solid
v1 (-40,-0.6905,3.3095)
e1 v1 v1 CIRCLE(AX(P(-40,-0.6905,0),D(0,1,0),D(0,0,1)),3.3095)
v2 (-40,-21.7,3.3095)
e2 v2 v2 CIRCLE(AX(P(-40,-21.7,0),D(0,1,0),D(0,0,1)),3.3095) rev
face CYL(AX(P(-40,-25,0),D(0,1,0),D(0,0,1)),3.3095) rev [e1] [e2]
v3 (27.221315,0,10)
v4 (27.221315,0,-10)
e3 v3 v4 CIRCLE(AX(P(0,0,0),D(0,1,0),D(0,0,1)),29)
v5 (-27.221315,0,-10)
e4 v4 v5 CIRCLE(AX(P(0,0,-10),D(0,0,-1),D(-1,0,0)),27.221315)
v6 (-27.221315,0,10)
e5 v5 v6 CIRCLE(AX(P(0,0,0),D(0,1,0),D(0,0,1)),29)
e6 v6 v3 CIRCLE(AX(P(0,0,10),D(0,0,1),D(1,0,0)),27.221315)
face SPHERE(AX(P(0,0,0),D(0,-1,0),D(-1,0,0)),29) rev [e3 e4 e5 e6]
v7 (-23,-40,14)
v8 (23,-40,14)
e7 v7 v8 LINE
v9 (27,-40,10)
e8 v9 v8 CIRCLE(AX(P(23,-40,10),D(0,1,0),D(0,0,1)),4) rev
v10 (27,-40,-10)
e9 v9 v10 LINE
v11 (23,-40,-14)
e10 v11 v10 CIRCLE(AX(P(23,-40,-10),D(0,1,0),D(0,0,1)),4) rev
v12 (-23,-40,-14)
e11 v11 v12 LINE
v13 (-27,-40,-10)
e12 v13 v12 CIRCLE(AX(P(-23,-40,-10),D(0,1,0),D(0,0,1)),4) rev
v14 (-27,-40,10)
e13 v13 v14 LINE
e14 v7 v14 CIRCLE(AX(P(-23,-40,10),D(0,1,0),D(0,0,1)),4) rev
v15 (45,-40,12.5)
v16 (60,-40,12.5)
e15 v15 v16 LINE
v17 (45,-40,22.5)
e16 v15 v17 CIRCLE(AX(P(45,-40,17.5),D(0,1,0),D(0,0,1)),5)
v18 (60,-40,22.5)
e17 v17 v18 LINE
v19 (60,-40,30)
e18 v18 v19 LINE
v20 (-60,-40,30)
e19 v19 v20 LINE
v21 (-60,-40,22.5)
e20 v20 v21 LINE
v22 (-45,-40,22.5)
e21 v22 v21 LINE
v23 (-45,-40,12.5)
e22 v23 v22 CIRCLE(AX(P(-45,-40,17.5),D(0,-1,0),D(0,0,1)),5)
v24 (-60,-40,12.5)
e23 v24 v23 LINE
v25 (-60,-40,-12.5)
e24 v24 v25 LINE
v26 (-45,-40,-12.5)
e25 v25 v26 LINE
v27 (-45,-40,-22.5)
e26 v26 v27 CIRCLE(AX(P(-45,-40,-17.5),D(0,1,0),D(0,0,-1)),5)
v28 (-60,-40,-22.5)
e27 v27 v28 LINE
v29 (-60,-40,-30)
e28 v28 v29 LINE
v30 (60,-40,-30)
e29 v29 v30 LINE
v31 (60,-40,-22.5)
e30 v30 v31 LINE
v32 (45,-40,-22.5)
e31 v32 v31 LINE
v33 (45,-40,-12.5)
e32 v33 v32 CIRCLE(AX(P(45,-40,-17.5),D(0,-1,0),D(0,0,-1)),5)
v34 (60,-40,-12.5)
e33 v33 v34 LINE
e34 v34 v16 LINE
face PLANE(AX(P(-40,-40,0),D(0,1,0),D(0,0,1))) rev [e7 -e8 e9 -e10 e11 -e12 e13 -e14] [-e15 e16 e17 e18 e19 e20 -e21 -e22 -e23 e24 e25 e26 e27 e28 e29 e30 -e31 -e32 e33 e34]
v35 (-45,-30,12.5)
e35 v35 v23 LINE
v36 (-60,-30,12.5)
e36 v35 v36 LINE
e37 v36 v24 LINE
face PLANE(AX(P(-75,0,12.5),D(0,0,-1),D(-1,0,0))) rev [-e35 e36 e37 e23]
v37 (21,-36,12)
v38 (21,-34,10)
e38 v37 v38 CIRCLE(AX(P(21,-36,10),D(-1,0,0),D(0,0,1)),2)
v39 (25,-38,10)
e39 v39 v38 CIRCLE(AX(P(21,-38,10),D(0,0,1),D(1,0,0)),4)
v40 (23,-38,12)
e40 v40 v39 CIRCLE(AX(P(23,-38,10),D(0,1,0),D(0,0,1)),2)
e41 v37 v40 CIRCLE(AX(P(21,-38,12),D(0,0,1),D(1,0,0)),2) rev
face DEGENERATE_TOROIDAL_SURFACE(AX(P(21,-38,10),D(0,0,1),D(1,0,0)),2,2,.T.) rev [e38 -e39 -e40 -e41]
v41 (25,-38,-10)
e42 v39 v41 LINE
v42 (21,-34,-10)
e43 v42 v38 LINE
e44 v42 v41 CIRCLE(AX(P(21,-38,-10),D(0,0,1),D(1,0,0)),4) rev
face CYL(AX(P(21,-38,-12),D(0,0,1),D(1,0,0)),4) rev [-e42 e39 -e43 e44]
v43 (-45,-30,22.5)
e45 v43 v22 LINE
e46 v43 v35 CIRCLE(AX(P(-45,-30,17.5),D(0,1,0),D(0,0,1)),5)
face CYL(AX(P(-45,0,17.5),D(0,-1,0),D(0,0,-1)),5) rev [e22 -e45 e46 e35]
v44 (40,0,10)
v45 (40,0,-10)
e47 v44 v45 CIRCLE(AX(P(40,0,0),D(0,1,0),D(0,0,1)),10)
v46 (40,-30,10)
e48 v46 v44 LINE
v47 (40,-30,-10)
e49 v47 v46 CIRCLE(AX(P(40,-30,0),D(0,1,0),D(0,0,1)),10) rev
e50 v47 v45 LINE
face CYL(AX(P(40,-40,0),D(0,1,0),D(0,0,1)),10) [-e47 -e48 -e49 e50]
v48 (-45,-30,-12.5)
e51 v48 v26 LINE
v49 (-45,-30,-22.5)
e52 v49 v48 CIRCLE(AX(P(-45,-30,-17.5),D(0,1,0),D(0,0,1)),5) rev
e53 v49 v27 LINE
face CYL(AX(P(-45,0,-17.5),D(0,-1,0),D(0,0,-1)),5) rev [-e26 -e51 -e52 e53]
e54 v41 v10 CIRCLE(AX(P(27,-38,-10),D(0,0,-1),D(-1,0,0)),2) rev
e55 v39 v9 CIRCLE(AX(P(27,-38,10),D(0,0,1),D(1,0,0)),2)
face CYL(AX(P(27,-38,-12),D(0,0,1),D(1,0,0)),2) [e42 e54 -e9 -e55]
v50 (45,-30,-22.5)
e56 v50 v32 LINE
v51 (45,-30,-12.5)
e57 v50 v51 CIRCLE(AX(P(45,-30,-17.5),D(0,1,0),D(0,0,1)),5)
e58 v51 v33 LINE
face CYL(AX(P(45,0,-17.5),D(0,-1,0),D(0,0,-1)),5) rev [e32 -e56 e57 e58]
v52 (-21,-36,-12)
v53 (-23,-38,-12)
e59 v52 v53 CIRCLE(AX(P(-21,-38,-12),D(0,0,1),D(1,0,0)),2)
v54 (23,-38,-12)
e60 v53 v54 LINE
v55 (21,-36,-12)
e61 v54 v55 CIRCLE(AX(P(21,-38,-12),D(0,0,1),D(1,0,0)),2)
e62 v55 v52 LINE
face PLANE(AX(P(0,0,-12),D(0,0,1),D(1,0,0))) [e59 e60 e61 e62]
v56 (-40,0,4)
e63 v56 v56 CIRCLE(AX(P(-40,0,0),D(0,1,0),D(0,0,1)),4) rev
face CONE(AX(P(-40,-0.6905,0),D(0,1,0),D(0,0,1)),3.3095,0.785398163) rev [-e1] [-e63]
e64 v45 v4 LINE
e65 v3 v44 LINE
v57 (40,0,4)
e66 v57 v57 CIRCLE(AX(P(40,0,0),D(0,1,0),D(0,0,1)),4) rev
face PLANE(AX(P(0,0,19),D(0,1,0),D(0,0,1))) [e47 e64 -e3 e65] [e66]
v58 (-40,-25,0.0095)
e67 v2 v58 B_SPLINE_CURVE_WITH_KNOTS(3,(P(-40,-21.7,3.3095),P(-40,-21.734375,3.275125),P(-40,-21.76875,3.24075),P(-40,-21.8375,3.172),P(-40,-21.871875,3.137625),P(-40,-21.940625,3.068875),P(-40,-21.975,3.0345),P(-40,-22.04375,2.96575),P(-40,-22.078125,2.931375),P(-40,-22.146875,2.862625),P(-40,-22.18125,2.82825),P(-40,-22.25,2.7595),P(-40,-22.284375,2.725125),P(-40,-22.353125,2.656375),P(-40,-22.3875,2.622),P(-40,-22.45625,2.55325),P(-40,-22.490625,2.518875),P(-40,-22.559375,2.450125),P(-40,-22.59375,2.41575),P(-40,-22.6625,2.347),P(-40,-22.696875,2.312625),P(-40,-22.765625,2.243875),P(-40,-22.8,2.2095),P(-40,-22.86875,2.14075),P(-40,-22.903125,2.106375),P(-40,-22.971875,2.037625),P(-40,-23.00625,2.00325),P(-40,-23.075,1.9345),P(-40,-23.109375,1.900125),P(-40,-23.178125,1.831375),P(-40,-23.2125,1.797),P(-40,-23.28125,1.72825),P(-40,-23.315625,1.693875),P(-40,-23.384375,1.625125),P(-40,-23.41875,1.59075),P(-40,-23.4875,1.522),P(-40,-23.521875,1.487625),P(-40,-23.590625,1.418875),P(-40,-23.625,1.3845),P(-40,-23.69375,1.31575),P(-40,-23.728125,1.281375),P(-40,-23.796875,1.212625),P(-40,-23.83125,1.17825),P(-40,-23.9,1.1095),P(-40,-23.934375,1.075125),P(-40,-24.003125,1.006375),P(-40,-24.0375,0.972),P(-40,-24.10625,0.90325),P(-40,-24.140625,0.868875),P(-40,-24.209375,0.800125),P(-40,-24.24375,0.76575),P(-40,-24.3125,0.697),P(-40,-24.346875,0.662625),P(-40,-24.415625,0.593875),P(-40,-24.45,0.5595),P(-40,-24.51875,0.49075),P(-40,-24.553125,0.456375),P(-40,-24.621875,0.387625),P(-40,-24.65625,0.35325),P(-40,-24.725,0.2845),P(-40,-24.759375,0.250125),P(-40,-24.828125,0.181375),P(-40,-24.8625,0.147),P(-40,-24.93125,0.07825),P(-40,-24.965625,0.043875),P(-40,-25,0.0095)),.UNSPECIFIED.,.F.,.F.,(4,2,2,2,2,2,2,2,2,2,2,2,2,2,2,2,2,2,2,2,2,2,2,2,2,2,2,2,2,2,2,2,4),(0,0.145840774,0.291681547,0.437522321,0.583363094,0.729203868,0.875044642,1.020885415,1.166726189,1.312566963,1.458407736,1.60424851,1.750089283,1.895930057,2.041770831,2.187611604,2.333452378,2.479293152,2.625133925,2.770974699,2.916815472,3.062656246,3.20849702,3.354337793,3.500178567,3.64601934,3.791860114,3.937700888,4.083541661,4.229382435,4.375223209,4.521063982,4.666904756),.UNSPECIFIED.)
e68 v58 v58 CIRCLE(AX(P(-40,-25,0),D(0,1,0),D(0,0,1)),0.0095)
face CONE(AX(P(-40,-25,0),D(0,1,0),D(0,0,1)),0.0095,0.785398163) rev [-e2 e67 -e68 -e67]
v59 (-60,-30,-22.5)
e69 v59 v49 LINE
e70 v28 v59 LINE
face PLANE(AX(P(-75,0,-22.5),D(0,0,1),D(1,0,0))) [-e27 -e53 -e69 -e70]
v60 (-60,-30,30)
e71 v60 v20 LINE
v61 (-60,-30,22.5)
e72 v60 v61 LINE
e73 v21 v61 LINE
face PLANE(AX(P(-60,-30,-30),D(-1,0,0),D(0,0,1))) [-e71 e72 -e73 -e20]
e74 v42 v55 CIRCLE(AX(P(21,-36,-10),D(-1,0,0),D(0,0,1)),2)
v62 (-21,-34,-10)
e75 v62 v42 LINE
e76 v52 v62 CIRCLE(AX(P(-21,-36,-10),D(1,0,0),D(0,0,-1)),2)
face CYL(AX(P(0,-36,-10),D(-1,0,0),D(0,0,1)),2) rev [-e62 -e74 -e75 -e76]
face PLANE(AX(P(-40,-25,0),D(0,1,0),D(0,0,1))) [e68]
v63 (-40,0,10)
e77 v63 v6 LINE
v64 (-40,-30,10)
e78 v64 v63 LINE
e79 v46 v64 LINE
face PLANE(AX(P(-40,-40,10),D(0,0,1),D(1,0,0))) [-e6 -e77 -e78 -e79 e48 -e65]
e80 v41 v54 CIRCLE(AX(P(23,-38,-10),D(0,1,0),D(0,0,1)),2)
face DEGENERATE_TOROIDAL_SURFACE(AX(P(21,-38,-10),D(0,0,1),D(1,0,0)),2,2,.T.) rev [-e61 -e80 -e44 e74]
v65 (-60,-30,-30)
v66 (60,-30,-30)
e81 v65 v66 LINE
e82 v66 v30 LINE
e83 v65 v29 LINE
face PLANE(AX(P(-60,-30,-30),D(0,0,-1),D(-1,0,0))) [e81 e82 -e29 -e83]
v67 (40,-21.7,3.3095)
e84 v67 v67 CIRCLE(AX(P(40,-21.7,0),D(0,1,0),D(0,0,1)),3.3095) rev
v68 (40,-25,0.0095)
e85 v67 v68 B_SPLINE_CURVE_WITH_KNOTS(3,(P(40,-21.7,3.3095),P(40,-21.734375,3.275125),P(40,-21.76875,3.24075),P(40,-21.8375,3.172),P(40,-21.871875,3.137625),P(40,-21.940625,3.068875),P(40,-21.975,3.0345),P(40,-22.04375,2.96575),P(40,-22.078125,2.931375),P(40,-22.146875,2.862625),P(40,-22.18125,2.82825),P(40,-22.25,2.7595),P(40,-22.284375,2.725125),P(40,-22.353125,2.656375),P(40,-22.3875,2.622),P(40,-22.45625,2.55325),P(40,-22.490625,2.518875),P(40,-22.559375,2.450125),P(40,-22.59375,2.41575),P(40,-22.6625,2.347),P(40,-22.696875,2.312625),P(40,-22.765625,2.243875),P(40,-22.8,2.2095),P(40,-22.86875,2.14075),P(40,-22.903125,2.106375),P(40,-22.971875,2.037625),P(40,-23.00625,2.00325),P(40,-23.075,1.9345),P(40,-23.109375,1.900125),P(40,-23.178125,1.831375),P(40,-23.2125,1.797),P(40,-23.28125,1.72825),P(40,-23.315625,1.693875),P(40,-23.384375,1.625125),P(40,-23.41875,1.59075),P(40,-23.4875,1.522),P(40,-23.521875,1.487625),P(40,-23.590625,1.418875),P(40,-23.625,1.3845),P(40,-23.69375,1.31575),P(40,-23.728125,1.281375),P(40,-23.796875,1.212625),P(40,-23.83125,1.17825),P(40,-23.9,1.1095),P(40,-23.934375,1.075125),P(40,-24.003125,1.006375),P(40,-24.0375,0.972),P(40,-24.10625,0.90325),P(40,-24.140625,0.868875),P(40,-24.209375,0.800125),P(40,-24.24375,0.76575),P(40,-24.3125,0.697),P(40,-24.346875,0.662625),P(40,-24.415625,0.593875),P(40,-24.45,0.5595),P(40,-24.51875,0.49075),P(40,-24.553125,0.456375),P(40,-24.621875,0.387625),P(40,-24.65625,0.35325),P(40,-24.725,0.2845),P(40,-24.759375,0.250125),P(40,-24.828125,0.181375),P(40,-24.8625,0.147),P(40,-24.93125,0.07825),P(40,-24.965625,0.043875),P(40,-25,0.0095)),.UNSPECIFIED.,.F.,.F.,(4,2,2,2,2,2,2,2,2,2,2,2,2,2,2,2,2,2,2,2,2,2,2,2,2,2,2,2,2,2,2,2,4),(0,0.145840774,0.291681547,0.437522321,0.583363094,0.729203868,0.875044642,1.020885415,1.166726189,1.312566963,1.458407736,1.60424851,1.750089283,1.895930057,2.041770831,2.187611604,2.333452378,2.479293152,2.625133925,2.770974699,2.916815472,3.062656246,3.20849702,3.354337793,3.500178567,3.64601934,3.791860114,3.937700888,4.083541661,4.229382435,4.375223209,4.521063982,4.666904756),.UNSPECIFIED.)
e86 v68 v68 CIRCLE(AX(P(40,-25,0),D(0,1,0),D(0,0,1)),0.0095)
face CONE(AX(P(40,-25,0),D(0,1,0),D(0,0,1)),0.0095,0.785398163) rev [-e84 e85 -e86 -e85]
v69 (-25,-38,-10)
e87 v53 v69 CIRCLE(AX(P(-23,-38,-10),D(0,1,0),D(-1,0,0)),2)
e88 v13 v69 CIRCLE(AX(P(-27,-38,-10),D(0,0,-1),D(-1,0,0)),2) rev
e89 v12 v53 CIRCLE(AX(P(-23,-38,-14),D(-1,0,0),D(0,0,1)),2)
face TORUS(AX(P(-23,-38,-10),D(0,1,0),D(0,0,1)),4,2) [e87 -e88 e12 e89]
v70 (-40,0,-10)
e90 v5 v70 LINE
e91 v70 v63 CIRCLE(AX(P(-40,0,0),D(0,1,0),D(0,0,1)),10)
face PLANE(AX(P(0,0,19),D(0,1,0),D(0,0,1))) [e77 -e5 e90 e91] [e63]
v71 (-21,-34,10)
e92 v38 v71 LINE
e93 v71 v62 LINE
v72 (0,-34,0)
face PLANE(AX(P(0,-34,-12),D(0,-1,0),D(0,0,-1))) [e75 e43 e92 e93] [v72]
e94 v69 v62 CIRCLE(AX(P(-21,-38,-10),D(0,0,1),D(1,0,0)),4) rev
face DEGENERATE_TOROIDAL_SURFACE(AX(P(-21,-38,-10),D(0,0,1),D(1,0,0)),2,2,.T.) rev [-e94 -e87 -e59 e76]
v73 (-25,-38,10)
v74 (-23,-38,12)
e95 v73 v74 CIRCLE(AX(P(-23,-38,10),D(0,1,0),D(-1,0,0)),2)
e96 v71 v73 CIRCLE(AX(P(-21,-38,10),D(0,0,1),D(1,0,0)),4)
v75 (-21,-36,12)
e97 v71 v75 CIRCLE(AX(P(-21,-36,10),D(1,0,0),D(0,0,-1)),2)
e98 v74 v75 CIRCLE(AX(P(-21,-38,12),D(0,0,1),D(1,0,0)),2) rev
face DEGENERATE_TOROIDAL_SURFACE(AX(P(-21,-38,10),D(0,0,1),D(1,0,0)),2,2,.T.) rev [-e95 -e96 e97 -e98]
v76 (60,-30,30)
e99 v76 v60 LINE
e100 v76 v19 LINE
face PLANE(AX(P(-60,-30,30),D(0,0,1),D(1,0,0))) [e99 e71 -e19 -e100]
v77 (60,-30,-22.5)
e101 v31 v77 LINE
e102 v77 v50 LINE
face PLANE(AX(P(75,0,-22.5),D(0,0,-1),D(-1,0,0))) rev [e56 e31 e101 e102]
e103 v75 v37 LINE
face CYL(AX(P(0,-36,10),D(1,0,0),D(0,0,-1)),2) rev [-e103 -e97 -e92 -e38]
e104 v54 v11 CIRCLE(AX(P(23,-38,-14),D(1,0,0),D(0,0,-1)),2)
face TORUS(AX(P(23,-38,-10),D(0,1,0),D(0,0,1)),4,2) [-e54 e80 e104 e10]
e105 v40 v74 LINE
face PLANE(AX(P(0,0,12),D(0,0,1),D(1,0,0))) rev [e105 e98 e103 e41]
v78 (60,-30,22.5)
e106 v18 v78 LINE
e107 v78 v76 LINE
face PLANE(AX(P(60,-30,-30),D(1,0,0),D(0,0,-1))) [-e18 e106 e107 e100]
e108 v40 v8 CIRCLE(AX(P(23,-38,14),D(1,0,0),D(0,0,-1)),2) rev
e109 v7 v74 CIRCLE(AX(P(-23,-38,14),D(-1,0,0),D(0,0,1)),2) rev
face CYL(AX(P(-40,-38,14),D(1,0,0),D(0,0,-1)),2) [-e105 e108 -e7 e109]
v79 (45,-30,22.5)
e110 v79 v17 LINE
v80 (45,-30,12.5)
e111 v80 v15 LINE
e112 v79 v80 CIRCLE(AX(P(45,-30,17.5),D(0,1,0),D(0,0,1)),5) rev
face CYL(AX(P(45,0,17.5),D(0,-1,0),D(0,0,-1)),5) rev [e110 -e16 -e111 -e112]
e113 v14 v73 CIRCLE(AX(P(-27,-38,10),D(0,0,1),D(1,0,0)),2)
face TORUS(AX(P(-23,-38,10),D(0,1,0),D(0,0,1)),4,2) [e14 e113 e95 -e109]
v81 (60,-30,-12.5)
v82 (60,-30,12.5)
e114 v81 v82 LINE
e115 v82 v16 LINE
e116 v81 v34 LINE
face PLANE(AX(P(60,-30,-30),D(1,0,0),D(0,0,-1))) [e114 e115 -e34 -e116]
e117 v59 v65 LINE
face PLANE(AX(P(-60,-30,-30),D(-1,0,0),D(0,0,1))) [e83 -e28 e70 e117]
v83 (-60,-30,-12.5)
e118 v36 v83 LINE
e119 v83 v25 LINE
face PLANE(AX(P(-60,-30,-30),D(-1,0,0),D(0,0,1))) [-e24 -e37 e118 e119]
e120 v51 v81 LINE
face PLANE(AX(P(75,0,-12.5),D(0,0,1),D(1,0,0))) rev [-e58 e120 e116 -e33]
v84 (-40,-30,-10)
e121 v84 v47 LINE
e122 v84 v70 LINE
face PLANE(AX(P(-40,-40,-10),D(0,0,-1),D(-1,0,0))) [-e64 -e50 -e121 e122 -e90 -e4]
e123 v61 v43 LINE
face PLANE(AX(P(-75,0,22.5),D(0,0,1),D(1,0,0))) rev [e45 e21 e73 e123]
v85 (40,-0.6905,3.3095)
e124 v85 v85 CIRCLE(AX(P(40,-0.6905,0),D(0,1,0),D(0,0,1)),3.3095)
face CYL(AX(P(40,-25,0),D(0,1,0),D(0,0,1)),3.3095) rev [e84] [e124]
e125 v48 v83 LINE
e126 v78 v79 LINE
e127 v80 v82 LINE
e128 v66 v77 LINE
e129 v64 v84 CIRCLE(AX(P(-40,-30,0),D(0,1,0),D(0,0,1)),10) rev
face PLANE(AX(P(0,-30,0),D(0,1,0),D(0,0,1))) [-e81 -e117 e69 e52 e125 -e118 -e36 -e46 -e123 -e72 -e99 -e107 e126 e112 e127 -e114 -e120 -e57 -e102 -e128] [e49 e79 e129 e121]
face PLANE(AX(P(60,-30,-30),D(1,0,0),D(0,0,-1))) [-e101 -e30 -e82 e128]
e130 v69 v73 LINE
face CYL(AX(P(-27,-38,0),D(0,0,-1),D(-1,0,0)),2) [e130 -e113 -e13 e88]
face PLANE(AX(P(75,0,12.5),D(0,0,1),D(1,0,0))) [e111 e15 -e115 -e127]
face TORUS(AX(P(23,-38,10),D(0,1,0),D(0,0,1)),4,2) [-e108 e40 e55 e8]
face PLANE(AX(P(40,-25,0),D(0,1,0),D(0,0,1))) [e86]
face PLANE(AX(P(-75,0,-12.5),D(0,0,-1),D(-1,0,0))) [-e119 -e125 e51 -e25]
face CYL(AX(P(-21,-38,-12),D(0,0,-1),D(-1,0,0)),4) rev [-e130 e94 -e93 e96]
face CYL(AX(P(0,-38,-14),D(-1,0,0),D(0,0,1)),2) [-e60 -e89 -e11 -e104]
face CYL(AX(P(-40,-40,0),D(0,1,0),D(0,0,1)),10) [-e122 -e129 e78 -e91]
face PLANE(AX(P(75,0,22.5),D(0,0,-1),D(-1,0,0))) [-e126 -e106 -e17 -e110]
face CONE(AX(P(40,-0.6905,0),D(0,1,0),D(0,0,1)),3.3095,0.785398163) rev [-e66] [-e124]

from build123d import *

# Parameters (mm, degrees)
EXTRUDE_2_DEPTH          = 19
EXTRUDE_5_DEPTH          = 40
CUT_EXTRUDE_START        = -10
SKETCH_1_4_R             = 24
CUT_EXTRUDE_1_DEPTH      = 20
SKETCH_4_W               = 120
SKETCH_4_H               = 60
EXTRUDE_6_DEPTH          = 10
FILLET_2_R               = 5
CUT_EXTRUDE_2_DEPTH      = 79.102496759
MIRROR_2_COPY_1_DEPTH    = 79.102496759
CUT_EXTRUDE_3_DEPTH      = 12
SKETCH_6_W               = 25
SKETCH_6_H               = 6
CUT_EXTRUDE_4_DEPTH      = 12
FILLET_3_R               = 4
FILLET_4_R               = 2
SKETCH_7_R               = 3.3095
CUT_EXTRUDE_5_DEPTH      = 25
CHAMFER_1_SIZE           = 3.3
CHAMFER_2_SIZE           = 0.6905
SKETCH_11_W              = 120
SKETCH_11_H              = 68
CUT_EXTRUDE_8_DEPTH      = 80.724525712
CUT_EXTRUDE_9_DEPTH      = 90.493016487
CUT_EXTRUDE_9_DEPTH_BACK = 9
SKETCH_12_W              = 80
SKETCH_12_H              = 30
SKETCH_13_W              = 80
SKETCH_13_H              = 30
CUT_EXTRUDE_10_DEPTH     = 83.462112512


with BuildPart() as part:
    # Эскиз1 → Бобышка-Вытянуть2 (new, symmetric)
    with BuildSketch(Plane.XY):
        with BuildLine():
            Line((35, 0), (26, 0))
            ThreePointArc((26, 0), (0, -26), (-26, 0))
            Line((-26, 0), (-35, 0))
            ThreePointArc((-35, 0), (0, -35), (35, 0))
        make_face()
        with BuildLine():
            Line((26, 0), (24, 0))
            ThreePointArc((24, 0), (0, -24), (-24, 0))
            Line((-24, 0), (-26, 0))
            ThreePointArc((-26, 0), (0, -26), (26, 0))
        make_face()
    extrude(amount=EXTRUDE_2_DEPTH, both=True)

    # Эскиз2 → Бобышка-Вытянуть5 (add)
    with BuildSketch(Plane(origin=(0, 0, 0), x_dir=(1, 0, 0), z_dir=(0, 1, 0))):
        with BuildLine():
            Line((-40, 10), (40, 10))
            ThreePointArc((40, 10), (50, 0), (40, -10))
            Line((40, -10), (-40, -10))
            ThreePointArc((-40, -10), (-50, 0), (-40, 10))
        make_face()
    extrude(amount=-EXTRUDE_5_DEPTH)

    # Эскиз1<4> → Вырез-Вытянуть1 (cut)
    with BuildSketch(Plane.XY.offset(CUT_EXTRUDE_START)):
        Circle(SKETCH_1_4_R)
    extrude(amount=CUT_EXTRUDE_1_DEPTH, mode=Mode.SUBTRACT)

    # Эскиз4 → Бобышка-Вытянуть6 (add)
    with BuildSketch(Plane.XZ.offset(40)):
        Rectangle(SKETCH_4_W, SKETCH_4_H)
    extrude(amount=-EXTRUDE_6_DEPTH)

    # Скругление2
    fillet_2_edges = [part.edges().sort_by_distance(p)[0] for p in [
        (-18.027756377, -30, 14.5),
        (18.027756377, -30, 14.5),
        (18.027756377, -30, -14.5),
        (-18.027756377, -30, -14.5),
    ]]
    fillet(fillet_2_edges, radius=FILLET_2_R)

    # Эскиз5 → Вырез-Вытянуть2 (cut, through all)
    with BuildSketch(Plane.XZ.offset(40)):
        with BuildLine():
            Line((75, -22.5), (45, -22.5))
            ThreePointArc((45, -22.5), (40, -17.5), (45, -12.5))
            Line((45, -12.5), (75, -12.5))
            ThreePointArc((75, -12.5), (80, -17.5), (75, -22.5))
        make_face()
    cut_extrude_2 = extrude(amount=-CUT_EXTRUDE_2_DEPTH, mode=Mode.SUBTRACT)

    # Зеркальное отражение1: Вырез-Вытянуть2 across plane
    add(cut_extrude_2.mirror(Plane.XY), mode=Mode.SUBTRACT)

    # Зеркальное отражение2: Вырез-Вытянуть2 across plane
    add(cut_extrude_2.mirror(Plane(origin=(0, 0, 0), x_dir=(0, 0, 1), z_dir=(1, 0, 0))), mode=Mode.SUBTRACT)

    # Зеркальное отражение2 copy 1 sketch → Зеркальное отражение2 copy 1 (cut, through all)
    with BuildSketch(Plane(origin=(0, -40, 0), x_dir=(-1, 0, 0), z_dir=(0, -1, 0))):
        with BuildLine():
            Line((75, -22.5), (45, -22.5))
            ThreePointArc((45, -22.5), (40, -17.5), (45, -12.5))
            Line((45, -12.5), (75, -12.5))
            ThreePointArc((75, -12.5), (80, -17.5), (75, -22.5))
        make_face()
    extrude(amount=-MIRROR_2_COPY_1_DEPTH, mode=Mode.SUBTRACT)

    # Эскиз1<5> → Вырез-Вытянуть3 (cut, symmetric)
    with BuildSketch(Plane.XY):
        with BuildLine():
            ThreePointArc((-24, 0), (0, 24), (24, 0))
            Line((24, 0), (26, 0))
            ThreePointArc((26, 0), (0, 26), (-26, 0))
            Line((-26, 0), (-24, 0))
        make_face()
        with BuildLine():
            Line((26, 0), (24, 0))
            ThreePointArc((24, 0), (0, -24), (-24, 0))
            Line((-24, 0), (-26, 0))
            ThreePointArc((-26, 0), (0, -26), (26, 0))
        make_face()
    extrude(amount=CUT_EXTRUDE_3_DEPTH, both=True, mode=Mode.SUBTRACT)

    # Эскиз6 → Вырез-Вытянуть4 (cut, symmetric)
    with BuildSketch(Plane.XY):
        with Locations((12.5, -37)):
            Rectangle(SKETCH_6_W, SKETCH_6_H)
    cut_extrude_4 = extrude(amount=CUT_EXTRUDE_4_DEPTH, both=True, mode=Mode.SUBTRACT)

    # Зеркальное отражение3: Вырез-Вытянуть4 across plane
    add(cut_extrude_4.mirror(Plane(origin=(0, -34, -12), x_dir=(0, 0, 1), z_dir=(-1, 0, 0))), mode=Mode.SUBTRACT)

    # Скругление3
    fillet_3_edges = [part.edges().sort_by_distance(p)[0] for p in [
        (25, -34, 0),
        (-25, -34, 0),
    ]]
    fillet(fillet_3_edges, radius=FILLET_3_R)

    # Скругление4
    fillet_4_edges = [part.edges().sort_by_distance(p)[0] for p in [
        (-23.828427125, -35.171572875, 12),
        (23.828427125, -35.171572875, 12),
        (-23.828427125, -35.171572875, -12),
        (23.828427125, -35.171572875, -12),
        (0, -34, 12),
        (0, -34, -12),
        (0, -40, 12),
        (-25, -40, 0),
        (25, -40, 0),
        (0, -40, -12),
    ]]
    fillet(fillet_4_edges, radius=FILLET_4_R - 0.0001)  # a hair under: the kernel refuses the full size

    # Эскиз7 → Вырез-Вытянуть5 (cut)
    with BuildSketch(Plane(origin=(0, 0, 0), x_dir=(1, 0, 0), z_dir=(0, 1, 0))):
        with Locations(Location((-40, 0, 0), (0, 0, 270))):
            Circle(SKETCH_7_R)
        with Locations(Location((40, 0, 0), (0, 0, 270))):
            Circle(SKETCH_7_R)
    extrude(amount=-CUT_EXTRUDE_5_DEPTH, mode=Mode.SUBTRACT)

    # Фаска1
    chamfer_1_edges = [part.edges().sort_by_distance(p)[0] for p in [
        (-40, -25, -3.3095),
        (40, -25, -3.3095),
    ]]
    chamfer(chamfer_1_edges, length=CHAMFER_1_SIZE)

    # Фаска2
    chamfer_2_edges = [part.edges().sort_by_distance(p)[0] for p in [
        (-40, 0, -3.3095),
        (40, 0, -3.3095),
    ]]
    chamfer(chamfer_2_edges, length=CHAMFER_2_SIZE)

    # Эскиз8 → Повернуть1 (revolve)
    with BuildSketch(Plane.XY):
        with BuildLine():
            Line((0, 34), (0, -34))
            ThreePointArc((0, -34), (-34, 0), (0, 34))
        make_face()
    revolve(axis=Axis((0, 0, 0), (0, 1, 0)))

    # Эскиз9 → Вырез-Повернуть1 (revolve, cut)
    with BuildSketch(Plane.XY):
        with BuildLine():
            Line((0, 29), (0, -29))
            ThreePointArc((0, -29), (-29, 0), (0, 29))
        make_face()
    revolve(axis=Axis((0, 0, 0), (0, 1, 0)), mode=Mode.SUBTRACT)

    # Эскиз11 → Вырез-Вытянуть8 (cut, through all)
    with BuildSketch(Plane(origin=(0, 0, 0), x_dir=(1, 0, 0), z_dir=(0, 1, 0))):
        Rectangle(SKETCH_11_W, SKETCH_11_H)
    extrude(amount=CUT_EXTRUDE_8_DEPTH, mode=Mode.SUBTRACT)

    # Эскиз12 → Вырез-Вытянуть9 (cut, two sides: drawn at the far end of the back side and taken through both)
    with BuildSketch(Plane.XY.offset(19).offset(-CUT_EXTRUDE_9_DEPTH_BACK)):
        with Locations((0, -15)):
            Rectangle(SKETCH_12_W, SKETCH_12_H)
    extrude(amount=CUT_EXTRUDE_9_DEPTH + CUT_EXTRUDE_9_DEPTH_BACK, mode=Mode.SUBTRACT)

    # Эскиз13 → Вырез-Вытянуть10 (cut, through all)
    with BuildSketch(Plane(origin=(0, 0, -10), x_dir=(-1, 0, 0), z_dir=(0, 0, -1))):
        with Locations((0, -15)):
            Rectangle(SKETCH_13_W, SKETCH_13_H)
    extrude(amount=CUT_EXTRUDE_10_DEPTH, mode=Mode.SUBTRACT)


solid = part.part
